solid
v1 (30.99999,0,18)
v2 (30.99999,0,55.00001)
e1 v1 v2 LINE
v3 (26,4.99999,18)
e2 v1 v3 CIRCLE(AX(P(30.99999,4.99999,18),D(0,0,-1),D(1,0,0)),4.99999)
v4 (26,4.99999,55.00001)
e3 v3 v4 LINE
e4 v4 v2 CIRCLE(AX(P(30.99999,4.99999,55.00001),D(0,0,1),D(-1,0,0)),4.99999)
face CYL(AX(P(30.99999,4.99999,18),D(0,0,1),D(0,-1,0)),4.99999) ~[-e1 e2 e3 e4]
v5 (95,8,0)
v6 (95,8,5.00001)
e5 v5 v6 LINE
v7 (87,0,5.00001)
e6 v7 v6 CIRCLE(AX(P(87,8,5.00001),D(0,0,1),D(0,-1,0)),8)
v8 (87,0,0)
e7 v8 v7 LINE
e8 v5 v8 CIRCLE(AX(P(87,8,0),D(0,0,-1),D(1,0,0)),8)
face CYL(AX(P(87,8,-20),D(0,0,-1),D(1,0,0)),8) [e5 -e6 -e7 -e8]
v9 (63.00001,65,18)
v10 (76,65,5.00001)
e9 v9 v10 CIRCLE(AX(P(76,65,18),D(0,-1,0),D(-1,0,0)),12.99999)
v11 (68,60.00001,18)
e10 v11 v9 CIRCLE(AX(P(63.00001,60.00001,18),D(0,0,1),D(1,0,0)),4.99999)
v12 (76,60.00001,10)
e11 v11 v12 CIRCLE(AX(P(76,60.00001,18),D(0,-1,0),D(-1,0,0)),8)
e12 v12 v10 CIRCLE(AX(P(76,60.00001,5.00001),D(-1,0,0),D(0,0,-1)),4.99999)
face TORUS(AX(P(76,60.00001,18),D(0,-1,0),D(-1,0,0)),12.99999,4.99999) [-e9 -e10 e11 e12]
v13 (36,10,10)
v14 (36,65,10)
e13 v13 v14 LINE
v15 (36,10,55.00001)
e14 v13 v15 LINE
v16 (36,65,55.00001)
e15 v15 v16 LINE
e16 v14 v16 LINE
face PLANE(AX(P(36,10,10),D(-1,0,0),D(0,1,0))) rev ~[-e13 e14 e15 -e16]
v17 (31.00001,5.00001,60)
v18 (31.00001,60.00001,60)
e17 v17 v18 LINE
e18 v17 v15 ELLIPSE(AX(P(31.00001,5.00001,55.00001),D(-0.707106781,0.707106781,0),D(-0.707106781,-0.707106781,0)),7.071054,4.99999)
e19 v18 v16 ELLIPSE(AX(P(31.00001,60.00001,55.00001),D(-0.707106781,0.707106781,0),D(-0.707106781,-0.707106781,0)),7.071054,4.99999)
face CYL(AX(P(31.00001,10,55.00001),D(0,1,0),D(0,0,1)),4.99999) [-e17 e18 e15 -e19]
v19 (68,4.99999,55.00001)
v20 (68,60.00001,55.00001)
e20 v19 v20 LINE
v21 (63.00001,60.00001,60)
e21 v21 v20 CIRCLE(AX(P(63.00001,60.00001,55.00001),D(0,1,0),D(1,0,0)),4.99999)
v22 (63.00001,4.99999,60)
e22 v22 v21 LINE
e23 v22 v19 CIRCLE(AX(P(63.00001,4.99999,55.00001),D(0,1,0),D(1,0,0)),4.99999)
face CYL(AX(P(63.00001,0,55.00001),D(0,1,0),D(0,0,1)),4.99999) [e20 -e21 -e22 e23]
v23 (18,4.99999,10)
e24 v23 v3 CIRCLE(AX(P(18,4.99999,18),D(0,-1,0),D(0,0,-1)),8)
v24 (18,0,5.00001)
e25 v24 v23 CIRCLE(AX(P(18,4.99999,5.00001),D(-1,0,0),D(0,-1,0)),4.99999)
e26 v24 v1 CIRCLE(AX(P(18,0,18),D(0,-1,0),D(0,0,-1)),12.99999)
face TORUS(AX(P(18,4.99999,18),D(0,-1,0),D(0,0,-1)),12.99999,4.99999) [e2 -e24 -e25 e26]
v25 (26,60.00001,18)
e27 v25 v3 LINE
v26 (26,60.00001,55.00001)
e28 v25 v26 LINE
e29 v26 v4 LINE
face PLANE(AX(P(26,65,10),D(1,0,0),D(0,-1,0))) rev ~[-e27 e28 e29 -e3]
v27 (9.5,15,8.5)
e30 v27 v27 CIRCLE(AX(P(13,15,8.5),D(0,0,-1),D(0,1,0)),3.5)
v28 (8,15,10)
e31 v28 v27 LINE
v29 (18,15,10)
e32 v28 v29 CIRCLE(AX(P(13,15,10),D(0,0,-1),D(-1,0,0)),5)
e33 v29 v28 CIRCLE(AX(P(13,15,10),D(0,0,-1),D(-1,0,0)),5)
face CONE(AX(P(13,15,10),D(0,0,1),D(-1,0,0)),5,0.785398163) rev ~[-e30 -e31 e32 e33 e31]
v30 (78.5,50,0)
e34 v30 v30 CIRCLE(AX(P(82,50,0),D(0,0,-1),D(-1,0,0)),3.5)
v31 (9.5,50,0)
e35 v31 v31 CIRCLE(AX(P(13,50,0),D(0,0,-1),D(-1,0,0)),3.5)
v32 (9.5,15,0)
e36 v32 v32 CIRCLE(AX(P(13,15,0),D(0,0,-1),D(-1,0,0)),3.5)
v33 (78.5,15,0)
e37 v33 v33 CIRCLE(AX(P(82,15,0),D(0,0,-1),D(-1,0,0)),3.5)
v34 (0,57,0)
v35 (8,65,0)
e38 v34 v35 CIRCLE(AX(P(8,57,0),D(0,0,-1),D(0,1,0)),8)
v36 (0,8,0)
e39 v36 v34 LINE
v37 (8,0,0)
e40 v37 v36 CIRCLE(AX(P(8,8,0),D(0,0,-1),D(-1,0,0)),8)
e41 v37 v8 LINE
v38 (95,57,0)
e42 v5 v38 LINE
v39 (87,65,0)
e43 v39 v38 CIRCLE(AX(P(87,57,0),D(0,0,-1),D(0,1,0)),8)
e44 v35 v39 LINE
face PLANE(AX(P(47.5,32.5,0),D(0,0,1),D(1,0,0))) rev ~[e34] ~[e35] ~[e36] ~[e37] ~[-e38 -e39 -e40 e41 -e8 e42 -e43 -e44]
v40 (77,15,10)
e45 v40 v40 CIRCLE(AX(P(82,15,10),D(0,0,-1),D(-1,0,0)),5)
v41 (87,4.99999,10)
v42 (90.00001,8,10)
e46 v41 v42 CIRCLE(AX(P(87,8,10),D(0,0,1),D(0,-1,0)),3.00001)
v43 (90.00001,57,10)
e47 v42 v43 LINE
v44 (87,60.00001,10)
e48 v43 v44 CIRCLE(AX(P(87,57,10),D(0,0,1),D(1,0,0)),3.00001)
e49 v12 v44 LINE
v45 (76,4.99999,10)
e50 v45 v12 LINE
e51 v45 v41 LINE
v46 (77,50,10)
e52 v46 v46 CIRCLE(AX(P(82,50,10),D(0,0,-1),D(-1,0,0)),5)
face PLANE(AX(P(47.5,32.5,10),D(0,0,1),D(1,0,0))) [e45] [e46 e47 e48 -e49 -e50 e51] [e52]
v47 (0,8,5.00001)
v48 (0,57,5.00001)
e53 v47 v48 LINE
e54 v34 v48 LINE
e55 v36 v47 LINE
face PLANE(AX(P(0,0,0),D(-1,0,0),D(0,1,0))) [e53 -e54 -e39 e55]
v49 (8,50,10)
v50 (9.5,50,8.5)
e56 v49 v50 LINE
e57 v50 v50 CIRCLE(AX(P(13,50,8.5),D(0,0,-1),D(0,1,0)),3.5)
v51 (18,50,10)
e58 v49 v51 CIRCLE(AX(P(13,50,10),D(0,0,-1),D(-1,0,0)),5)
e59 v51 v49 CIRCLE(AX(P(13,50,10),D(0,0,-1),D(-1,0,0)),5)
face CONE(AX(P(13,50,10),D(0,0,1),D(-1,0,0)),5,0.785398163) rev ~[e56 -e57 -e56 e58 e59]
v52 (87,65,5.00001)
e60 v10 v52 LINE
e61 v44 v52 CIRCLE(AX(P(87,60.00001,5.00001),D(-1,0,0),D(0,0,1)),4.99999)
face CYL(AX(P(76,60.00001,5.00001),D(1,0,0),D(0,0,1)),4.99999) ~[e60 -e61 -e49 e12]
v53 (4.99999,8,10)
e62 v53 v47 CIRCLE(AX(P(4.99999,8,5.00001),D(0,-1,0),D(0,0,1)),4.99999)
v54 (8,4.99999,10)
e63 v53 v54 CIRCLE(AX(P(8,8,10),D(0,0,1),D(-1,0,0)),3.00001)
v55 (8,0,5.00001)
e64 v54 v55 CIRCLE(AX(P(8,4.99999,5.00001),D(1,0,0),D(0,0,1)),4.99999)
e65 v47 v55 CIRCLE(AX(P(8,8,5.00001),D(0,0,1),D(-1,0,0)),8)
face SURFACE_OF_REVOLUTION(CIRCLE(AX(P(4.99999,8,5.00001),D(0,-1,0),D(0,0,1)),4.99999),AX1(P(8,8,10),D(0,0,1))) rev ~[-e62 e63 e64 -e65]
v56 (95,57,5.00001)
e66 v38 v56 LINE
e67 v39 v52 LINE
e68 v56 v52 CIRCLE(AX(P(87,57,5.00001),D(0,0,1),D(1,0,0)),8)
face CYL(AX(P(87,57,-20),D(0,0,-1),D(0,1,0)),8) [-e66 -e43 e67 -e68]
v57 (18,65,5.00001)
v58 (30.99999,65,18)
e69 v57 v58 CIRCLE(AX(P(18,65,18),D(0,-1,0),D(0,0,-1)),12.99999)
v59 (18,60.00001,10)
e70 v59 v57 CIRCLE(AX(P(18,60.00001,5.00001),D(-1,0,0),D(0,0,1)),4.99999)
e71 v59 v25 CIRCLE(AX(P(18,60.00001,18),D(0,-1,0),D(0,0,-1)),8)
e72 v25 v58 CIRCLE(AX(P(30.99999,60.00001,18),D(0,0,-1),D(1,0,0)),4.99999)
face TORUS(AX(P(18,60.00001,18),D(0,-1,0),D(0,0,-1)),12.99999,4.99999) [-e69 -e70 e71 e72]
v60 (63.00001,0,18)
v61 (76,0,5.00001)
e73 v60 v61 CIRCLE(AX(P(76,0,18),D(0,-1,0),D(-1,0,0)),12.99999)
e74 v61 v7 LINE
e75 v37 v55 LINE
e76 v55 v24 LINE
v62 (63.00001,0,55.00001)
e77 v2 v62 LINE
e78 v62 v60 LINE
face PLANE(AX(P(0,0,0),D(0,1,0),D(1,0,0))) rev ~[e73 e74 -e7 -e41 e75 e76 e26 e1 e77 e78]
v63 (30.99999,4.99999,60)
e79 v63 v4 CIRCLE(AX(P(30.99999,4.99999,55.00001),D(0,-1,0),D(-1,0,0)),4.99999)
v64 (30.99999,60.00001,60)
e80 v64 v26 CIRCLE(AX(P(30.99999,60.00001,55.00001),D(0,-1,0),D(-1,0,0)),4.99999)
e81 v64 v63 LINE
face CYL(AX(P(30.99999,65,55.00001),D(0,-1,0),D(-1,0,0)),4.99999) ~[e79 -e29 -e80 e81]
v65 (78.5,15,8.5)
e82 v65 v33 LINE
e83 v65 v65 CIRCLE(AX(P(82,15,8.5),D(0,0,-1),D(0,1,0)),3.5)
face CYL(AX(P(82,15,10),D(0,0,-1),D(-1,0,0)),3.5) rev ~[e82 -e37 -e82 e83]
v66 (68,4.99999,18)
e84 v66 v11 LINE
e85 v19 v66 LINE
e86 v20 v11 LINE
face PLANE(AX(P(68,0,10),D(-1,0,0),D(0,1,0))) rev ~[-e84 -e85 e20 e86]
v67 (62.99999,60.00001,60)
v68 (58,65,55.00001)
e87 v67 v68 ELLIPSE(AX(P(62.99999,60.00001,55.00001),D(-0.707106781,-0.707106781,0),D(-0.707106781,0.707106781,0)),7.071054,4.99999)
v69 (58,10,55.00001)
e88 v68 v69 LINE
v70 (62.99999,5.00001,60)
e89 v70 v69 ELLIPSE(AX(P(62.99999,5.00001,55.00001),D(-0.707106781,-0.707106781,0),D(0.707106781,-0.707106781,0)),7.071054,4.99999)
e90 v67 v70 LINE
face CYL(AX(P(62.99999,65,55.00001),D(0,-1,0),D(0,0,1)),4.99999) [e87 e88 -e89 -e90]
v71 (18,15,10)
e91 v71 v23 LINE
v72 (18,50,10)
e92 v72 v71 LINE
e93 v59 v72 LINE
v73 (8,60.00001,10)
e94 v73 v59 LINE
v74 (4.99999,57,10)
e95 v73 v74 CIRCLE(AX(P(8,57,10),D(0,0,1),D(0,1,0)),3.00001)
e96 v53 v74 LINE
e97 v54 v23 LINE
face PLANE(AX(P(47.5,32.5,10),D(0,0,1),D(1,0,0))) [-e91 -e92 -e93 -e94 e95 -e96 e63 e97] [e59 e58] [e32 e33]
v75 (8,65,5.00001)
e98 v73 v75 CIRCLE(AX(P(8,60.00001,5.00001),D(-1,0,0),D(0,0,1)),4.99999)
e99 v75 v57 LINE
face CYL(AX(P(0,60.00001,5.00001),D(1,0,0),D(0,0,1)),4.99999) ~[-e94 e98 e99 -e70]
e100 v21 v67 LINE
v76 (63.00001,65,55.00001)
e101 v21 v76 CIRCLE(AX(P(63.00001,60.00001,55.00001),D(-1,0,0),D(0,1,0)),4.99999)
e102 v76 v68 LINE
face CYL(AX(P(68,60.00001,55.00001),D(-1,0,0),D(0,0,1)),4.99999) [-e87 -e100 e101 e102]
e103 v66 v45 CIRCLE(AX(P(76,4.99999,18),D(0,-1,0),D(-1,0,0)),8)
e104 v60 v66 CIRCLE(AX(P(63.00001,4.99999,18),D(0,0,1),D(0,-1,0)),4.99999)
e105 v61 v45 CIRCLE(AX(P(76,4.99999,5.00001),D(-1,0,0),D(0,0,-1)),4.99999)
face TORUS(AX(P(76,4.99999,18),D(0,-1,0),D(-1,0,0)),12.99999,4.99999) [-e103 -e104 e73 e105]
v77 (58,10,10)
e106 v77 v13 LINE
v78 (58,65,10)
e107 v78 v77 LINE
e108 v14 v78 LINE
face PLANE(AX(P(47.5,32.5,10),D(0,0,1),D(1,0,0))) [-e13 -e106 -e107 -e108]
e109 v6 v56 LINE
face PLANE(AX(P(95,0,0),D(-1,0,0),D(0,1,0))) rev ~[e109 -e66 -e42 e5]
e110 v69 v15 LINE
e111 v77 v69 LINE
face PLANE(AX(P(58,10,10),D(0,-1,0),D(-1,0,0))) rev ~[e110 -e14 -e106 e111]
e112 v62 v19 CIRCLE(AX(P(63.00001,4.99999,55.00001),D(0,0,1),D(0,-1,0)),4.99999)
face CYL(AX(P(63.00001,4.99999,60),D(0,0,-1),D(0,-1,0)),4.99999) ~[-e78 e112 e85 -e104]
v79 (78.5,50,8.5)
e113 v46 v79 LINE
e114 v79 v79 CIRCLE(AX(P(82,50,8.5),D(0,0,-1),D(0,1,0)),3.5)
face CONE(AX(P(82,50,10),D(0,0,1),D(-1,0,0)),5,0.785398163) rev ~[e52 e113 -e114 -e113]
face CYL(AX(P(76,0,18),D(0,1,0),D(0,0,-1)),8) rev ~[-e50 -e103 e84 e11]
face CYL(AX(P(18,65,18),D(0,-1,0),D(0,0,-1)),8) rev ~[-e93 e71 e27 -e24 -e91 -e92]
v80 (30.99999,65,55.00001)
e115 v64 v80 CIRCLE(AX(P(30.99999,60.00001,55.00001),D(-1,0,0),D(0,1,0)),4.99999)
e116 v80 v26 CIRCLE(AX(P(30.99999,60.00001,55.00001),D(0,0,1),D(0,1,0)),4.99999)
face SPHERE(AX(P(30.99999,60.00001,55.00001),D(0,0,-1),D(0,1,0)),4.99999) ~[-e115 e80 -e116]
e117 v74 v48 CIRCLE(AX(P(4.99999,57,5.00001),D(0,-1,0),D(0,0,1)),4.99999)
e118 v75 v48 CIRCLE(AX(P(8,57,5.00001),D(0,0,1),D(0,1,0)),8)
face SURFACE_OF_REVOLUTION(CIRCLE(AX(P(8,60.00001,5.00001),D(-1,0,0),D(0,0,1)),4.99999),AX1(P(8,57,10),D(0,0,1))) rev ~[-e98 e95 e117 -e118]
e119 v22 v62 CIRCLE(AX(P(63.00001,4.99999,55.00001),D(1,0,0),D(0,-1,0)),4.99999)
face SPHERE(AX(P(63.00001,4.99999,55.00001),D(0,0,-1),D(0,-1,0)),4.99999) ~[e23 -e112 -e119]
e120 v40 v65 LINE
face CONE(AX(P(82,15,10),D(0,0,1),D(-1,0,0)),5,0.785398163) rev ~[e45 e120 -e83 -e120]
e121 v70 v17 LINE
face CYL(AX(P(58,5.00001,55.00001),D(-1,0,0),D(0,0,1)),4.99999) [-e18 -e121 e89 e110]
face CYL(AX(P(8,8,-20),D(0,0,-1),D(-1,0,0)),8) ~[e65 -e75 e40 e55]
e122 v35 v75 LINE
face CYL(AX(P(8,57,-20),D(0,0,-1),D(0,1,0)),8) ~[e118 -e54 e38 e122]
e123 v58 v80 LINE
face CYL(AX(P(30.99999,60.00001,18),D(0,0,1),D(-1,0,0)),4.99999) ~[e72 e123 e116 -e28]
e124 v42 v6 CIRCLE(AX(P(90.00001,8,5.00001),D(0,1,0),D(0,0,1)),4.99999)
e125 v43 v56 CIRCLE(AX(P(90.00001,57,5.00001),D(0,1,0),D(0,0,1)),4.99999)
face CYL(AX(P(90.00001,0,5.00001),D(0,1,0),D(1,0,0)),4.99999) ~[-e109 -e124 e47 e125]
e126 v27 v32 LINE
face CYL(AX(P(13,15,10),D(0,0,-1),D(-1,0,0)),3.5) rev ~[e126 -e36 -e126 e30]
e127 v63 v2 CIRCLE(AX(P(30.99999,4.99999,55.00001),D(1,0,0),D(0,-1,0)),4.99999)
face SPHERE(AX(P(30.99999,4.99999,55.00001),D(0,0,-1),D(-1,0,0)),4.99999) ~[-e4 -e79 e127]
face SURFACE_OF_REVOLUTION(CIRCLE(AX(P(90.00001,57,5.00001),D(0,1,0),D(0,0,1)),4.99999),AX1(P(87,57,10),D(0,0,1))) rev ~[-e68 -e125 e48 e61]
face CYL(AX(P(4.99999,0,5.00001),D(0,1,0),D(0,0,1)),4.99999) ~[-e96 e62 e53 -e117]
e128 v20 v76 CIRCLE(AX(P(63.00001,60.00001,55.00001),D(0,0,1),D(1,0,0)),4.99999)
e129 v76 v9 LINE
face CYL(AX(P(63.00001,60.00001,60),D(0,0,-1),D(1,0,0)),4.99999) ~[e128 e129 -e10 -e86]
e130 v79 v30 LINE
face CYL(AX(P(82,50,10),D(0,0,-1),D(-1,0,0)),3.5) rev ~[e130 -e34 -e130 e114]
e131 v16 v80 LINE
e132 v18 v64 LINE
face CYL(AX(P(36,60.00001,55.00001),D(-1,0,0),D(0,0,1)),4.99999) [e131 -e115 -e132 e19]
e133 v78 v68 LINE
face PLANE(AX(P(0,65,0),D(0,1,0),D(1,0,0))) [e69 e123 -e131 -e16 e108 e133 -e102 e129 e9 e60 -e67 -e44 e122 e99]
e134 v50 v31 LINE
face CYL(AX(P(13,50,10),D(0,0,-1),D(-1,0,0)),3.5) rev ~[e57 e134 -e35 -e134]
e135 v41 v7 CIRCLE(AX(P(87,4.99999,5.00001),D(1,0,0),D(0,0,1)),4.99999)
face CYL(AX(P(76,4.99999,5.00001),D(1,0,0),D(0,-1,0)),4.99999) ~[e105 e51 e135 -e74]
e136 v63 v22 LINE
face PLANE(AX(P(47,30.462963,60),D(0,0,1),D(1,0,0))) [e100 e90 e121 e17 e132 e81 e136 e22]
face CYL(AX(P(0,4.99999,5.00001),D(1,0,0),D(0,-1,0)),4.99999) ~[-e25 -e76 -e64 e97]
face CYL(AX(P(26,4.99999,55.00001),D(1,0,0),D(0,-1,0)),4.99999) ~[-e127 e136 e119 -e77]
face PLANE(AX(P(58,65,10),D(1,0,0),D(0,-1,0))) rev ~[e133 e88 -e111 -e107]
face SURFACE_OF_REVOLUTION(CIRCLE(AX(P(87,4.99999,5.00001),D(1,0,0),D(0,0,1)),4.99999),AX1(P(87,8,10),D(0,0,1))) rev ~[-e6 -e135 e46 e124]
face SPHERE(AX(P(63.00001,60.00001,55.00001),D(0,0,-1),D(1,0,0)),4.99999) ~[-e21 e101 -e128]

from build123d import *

# Parameters (mm, degrees)
F0_W           = 95
F0_H           = 65
F1_DEPTH       = 10
F3_DEPTH       = 50
F4_R           = 8
F5_R           = 4.99999
F7_D           = 7
F7_CSINK_D     = 10
F7_CSINK_ANGLE = 90
F8_T1_DEPTH    = 30
F8_T4_ANGLE    = 90
F8_T6_ANGLE    = 90
F8_T8_ANGLE    = 90
F8_T10_ANGLE   = 90


# Not quite as in the source:
# - a fillet or chamfer that OpenCascade refuses, or shapes differently, is made with other operations: its cross-section is extruded or revolved along the edge and cut away or added
# - a fillet or chamfer is up to 0.001 mm smaller than in the source, because OpenCascade refuses the exact size


with BuildPart() as f1:
    # F0 (on Top) → F1 (new body)
    with BuildSketch(Plane.XY):
        with Locations((47.5, 32.5)):
            Rectangle(F0_W, F0_H)
    extrude(amount=F1_DEPTH)

    # F2 (on face) → F3 (join)
    with BuildSketch(Plane.XY.offset(10)):
        Polygon((36, 65), (26, 65), (26, 0), (68, 0), (68, 65), (58, 65), (58, 10), (36, 10), align=None)
    extrude(amount=F3_DEPTH)

    # F4
    f4_edges = [f1.edges().sort_by_distance(p)[0] for p in [
        (68, 32.5, 10),
        (26, 32.5, 10),
    ]]
    fillet(f4_edges, radius=F4_R)

    # F5 (radius 5 in the source; OpenCascade refuses exactly that, so slightly less here)
    f5_edges = [f1.edges().sort_by_distance(p)[0] for p in [
        (85.5, 65, 10),
        (76, 32.5, 10),
        (95, 32.5, 10),
        (85.5, 0, 10),
        (9, 65, 10),
        (18, 32.5, 10),
        (0, 32.5, 10),
        (9, 0, 10),
        (31, 65, 60),
        (26, 32.5, 60),
        (47, 0, 60),
        (68, 32.5, 60),
        (63, 65, 60),
        (58, 37.5, 60),
        (47, 10, 60),
        (36, 37.5, 60),
    ]]
    fillet(f5_edges, radius=F5_R)

    # F7 (through all)
    with Locations(Plane.XY.offset(10)):
        with Locations((13, 50), (13, 15), (82, 50), (82, 15)):
            CounterSinkHole(F7_D / 2, F7_CSINK_D / 2, counter_sink_angle=F7_CSINK_ANGLE)

    # F8: fillet of radius 8 on 4 edges, made by hand

    # F8_s2 → F8_t1 (cut)
    with BuildSketch(Plane.XY.offset(-20)):
        with BuildLine():
            ThreePointArc((8, 65), (2.3431457505, 62.6568542495), (0, 57))
            Line((0, 57), (0, 65))
            Line((0, 65), (8, 65))
        make_face()
        with BuildLine():
            ThreePointArc((87, 65), (92.6568542495, 62.6568542495), (95, 57))
            Line((95, 57), (95, 65))
            Line((95, 65), (87, 65))
        make_face()
        with BuildLine():
            ThreePointArc((95, 8), (92.6568542495, 2.3431457505), (87, 0))
            Line((87, 0), (95, 0))
            Line((95, 0), (95, 8))
        make_face()
        with BuildLine():
            ThreePointArc((0, 8), (2.3431457505, 2.3431457505), (8, 0))
            Line((8, 0), (0, 0))
            Line((0, 0), (0, 8))
        make_face()
    extrude(amount=F8_T1_DEPTH, mode=Mode.SUBTRACT)

    # F8_s3 → F8_t4 (revolve, cut)
    with BuildSketch(Plane.XZ.offset(-8)):
        with BuildLine():
            ThreePointArc((4.99999, 10), (1.4644631651, 8.5355368349), (0, 5.00001))
            Line((0, 5.00001), (0, 10))
            Line((0, 10), (4.99999, 10))
        make_face()
    revolve(axis=Axis((8, 8, 10), (0, 0, 1)), revolution_arc=F8_T4_ANGLE, mode=Mode.SUBTRACT)

    # F8_s5 → F8_t6 (revolve, cut)
    with BuildSketch(Plane.YZ.offset(87)):
        with BuildLine():
            ThreePointArc((4.99999, 10), (1.4644631651, 8.5355368349), (0, 5.00001))
            Line((0, 5.00001), (0, 10))
            Line((0, 10), (4.99999, 10))
        make_face()
    revolve(axis=Axis((87, 8, 10), (0, 0, 1)), revolution_arc=F8_T6_ANGLE, mode=Mode.SUBTRACT)

    # F8_s7 → F8_t8 (revolve, cut)
    with BuildSketch(Plane.XZ.offset(-57)):
        with BuildLine():
            ThreePointArc((90.00001, 10), (93.5355368349, 8.5355368349), (95, 5.00001))
            Line((95, 5.00001), (95, 10))
            Line((95, 10), (90.00001, 10))
        make_face()
    revolve(axis=Axis((87, 57, 10), (0, 0, 1)), revolution_arc=F8_T8_ANGLE, mode=Mode.SUBTRACT)

    # F8_s9 → F8_t10 (revolve, cut)
    with BuildSketch(Plane.YZ.offset(8)):
        with BuildLine():
            ThreePointArc((60.00001, 10), (63.5355368349, 8.5355368349), (65, 5.00001))
            Line((65, 5.00001), (65, 10))
            Line((65, 10), (60.00001, 10))
        make_face()
    revolve(axis=Axis((8, 57, 10), (0, 0, 1)), revolution_arc=F8_T10_ANGLE, mode=Mode.SUBTRACT)


solid = f1.part
